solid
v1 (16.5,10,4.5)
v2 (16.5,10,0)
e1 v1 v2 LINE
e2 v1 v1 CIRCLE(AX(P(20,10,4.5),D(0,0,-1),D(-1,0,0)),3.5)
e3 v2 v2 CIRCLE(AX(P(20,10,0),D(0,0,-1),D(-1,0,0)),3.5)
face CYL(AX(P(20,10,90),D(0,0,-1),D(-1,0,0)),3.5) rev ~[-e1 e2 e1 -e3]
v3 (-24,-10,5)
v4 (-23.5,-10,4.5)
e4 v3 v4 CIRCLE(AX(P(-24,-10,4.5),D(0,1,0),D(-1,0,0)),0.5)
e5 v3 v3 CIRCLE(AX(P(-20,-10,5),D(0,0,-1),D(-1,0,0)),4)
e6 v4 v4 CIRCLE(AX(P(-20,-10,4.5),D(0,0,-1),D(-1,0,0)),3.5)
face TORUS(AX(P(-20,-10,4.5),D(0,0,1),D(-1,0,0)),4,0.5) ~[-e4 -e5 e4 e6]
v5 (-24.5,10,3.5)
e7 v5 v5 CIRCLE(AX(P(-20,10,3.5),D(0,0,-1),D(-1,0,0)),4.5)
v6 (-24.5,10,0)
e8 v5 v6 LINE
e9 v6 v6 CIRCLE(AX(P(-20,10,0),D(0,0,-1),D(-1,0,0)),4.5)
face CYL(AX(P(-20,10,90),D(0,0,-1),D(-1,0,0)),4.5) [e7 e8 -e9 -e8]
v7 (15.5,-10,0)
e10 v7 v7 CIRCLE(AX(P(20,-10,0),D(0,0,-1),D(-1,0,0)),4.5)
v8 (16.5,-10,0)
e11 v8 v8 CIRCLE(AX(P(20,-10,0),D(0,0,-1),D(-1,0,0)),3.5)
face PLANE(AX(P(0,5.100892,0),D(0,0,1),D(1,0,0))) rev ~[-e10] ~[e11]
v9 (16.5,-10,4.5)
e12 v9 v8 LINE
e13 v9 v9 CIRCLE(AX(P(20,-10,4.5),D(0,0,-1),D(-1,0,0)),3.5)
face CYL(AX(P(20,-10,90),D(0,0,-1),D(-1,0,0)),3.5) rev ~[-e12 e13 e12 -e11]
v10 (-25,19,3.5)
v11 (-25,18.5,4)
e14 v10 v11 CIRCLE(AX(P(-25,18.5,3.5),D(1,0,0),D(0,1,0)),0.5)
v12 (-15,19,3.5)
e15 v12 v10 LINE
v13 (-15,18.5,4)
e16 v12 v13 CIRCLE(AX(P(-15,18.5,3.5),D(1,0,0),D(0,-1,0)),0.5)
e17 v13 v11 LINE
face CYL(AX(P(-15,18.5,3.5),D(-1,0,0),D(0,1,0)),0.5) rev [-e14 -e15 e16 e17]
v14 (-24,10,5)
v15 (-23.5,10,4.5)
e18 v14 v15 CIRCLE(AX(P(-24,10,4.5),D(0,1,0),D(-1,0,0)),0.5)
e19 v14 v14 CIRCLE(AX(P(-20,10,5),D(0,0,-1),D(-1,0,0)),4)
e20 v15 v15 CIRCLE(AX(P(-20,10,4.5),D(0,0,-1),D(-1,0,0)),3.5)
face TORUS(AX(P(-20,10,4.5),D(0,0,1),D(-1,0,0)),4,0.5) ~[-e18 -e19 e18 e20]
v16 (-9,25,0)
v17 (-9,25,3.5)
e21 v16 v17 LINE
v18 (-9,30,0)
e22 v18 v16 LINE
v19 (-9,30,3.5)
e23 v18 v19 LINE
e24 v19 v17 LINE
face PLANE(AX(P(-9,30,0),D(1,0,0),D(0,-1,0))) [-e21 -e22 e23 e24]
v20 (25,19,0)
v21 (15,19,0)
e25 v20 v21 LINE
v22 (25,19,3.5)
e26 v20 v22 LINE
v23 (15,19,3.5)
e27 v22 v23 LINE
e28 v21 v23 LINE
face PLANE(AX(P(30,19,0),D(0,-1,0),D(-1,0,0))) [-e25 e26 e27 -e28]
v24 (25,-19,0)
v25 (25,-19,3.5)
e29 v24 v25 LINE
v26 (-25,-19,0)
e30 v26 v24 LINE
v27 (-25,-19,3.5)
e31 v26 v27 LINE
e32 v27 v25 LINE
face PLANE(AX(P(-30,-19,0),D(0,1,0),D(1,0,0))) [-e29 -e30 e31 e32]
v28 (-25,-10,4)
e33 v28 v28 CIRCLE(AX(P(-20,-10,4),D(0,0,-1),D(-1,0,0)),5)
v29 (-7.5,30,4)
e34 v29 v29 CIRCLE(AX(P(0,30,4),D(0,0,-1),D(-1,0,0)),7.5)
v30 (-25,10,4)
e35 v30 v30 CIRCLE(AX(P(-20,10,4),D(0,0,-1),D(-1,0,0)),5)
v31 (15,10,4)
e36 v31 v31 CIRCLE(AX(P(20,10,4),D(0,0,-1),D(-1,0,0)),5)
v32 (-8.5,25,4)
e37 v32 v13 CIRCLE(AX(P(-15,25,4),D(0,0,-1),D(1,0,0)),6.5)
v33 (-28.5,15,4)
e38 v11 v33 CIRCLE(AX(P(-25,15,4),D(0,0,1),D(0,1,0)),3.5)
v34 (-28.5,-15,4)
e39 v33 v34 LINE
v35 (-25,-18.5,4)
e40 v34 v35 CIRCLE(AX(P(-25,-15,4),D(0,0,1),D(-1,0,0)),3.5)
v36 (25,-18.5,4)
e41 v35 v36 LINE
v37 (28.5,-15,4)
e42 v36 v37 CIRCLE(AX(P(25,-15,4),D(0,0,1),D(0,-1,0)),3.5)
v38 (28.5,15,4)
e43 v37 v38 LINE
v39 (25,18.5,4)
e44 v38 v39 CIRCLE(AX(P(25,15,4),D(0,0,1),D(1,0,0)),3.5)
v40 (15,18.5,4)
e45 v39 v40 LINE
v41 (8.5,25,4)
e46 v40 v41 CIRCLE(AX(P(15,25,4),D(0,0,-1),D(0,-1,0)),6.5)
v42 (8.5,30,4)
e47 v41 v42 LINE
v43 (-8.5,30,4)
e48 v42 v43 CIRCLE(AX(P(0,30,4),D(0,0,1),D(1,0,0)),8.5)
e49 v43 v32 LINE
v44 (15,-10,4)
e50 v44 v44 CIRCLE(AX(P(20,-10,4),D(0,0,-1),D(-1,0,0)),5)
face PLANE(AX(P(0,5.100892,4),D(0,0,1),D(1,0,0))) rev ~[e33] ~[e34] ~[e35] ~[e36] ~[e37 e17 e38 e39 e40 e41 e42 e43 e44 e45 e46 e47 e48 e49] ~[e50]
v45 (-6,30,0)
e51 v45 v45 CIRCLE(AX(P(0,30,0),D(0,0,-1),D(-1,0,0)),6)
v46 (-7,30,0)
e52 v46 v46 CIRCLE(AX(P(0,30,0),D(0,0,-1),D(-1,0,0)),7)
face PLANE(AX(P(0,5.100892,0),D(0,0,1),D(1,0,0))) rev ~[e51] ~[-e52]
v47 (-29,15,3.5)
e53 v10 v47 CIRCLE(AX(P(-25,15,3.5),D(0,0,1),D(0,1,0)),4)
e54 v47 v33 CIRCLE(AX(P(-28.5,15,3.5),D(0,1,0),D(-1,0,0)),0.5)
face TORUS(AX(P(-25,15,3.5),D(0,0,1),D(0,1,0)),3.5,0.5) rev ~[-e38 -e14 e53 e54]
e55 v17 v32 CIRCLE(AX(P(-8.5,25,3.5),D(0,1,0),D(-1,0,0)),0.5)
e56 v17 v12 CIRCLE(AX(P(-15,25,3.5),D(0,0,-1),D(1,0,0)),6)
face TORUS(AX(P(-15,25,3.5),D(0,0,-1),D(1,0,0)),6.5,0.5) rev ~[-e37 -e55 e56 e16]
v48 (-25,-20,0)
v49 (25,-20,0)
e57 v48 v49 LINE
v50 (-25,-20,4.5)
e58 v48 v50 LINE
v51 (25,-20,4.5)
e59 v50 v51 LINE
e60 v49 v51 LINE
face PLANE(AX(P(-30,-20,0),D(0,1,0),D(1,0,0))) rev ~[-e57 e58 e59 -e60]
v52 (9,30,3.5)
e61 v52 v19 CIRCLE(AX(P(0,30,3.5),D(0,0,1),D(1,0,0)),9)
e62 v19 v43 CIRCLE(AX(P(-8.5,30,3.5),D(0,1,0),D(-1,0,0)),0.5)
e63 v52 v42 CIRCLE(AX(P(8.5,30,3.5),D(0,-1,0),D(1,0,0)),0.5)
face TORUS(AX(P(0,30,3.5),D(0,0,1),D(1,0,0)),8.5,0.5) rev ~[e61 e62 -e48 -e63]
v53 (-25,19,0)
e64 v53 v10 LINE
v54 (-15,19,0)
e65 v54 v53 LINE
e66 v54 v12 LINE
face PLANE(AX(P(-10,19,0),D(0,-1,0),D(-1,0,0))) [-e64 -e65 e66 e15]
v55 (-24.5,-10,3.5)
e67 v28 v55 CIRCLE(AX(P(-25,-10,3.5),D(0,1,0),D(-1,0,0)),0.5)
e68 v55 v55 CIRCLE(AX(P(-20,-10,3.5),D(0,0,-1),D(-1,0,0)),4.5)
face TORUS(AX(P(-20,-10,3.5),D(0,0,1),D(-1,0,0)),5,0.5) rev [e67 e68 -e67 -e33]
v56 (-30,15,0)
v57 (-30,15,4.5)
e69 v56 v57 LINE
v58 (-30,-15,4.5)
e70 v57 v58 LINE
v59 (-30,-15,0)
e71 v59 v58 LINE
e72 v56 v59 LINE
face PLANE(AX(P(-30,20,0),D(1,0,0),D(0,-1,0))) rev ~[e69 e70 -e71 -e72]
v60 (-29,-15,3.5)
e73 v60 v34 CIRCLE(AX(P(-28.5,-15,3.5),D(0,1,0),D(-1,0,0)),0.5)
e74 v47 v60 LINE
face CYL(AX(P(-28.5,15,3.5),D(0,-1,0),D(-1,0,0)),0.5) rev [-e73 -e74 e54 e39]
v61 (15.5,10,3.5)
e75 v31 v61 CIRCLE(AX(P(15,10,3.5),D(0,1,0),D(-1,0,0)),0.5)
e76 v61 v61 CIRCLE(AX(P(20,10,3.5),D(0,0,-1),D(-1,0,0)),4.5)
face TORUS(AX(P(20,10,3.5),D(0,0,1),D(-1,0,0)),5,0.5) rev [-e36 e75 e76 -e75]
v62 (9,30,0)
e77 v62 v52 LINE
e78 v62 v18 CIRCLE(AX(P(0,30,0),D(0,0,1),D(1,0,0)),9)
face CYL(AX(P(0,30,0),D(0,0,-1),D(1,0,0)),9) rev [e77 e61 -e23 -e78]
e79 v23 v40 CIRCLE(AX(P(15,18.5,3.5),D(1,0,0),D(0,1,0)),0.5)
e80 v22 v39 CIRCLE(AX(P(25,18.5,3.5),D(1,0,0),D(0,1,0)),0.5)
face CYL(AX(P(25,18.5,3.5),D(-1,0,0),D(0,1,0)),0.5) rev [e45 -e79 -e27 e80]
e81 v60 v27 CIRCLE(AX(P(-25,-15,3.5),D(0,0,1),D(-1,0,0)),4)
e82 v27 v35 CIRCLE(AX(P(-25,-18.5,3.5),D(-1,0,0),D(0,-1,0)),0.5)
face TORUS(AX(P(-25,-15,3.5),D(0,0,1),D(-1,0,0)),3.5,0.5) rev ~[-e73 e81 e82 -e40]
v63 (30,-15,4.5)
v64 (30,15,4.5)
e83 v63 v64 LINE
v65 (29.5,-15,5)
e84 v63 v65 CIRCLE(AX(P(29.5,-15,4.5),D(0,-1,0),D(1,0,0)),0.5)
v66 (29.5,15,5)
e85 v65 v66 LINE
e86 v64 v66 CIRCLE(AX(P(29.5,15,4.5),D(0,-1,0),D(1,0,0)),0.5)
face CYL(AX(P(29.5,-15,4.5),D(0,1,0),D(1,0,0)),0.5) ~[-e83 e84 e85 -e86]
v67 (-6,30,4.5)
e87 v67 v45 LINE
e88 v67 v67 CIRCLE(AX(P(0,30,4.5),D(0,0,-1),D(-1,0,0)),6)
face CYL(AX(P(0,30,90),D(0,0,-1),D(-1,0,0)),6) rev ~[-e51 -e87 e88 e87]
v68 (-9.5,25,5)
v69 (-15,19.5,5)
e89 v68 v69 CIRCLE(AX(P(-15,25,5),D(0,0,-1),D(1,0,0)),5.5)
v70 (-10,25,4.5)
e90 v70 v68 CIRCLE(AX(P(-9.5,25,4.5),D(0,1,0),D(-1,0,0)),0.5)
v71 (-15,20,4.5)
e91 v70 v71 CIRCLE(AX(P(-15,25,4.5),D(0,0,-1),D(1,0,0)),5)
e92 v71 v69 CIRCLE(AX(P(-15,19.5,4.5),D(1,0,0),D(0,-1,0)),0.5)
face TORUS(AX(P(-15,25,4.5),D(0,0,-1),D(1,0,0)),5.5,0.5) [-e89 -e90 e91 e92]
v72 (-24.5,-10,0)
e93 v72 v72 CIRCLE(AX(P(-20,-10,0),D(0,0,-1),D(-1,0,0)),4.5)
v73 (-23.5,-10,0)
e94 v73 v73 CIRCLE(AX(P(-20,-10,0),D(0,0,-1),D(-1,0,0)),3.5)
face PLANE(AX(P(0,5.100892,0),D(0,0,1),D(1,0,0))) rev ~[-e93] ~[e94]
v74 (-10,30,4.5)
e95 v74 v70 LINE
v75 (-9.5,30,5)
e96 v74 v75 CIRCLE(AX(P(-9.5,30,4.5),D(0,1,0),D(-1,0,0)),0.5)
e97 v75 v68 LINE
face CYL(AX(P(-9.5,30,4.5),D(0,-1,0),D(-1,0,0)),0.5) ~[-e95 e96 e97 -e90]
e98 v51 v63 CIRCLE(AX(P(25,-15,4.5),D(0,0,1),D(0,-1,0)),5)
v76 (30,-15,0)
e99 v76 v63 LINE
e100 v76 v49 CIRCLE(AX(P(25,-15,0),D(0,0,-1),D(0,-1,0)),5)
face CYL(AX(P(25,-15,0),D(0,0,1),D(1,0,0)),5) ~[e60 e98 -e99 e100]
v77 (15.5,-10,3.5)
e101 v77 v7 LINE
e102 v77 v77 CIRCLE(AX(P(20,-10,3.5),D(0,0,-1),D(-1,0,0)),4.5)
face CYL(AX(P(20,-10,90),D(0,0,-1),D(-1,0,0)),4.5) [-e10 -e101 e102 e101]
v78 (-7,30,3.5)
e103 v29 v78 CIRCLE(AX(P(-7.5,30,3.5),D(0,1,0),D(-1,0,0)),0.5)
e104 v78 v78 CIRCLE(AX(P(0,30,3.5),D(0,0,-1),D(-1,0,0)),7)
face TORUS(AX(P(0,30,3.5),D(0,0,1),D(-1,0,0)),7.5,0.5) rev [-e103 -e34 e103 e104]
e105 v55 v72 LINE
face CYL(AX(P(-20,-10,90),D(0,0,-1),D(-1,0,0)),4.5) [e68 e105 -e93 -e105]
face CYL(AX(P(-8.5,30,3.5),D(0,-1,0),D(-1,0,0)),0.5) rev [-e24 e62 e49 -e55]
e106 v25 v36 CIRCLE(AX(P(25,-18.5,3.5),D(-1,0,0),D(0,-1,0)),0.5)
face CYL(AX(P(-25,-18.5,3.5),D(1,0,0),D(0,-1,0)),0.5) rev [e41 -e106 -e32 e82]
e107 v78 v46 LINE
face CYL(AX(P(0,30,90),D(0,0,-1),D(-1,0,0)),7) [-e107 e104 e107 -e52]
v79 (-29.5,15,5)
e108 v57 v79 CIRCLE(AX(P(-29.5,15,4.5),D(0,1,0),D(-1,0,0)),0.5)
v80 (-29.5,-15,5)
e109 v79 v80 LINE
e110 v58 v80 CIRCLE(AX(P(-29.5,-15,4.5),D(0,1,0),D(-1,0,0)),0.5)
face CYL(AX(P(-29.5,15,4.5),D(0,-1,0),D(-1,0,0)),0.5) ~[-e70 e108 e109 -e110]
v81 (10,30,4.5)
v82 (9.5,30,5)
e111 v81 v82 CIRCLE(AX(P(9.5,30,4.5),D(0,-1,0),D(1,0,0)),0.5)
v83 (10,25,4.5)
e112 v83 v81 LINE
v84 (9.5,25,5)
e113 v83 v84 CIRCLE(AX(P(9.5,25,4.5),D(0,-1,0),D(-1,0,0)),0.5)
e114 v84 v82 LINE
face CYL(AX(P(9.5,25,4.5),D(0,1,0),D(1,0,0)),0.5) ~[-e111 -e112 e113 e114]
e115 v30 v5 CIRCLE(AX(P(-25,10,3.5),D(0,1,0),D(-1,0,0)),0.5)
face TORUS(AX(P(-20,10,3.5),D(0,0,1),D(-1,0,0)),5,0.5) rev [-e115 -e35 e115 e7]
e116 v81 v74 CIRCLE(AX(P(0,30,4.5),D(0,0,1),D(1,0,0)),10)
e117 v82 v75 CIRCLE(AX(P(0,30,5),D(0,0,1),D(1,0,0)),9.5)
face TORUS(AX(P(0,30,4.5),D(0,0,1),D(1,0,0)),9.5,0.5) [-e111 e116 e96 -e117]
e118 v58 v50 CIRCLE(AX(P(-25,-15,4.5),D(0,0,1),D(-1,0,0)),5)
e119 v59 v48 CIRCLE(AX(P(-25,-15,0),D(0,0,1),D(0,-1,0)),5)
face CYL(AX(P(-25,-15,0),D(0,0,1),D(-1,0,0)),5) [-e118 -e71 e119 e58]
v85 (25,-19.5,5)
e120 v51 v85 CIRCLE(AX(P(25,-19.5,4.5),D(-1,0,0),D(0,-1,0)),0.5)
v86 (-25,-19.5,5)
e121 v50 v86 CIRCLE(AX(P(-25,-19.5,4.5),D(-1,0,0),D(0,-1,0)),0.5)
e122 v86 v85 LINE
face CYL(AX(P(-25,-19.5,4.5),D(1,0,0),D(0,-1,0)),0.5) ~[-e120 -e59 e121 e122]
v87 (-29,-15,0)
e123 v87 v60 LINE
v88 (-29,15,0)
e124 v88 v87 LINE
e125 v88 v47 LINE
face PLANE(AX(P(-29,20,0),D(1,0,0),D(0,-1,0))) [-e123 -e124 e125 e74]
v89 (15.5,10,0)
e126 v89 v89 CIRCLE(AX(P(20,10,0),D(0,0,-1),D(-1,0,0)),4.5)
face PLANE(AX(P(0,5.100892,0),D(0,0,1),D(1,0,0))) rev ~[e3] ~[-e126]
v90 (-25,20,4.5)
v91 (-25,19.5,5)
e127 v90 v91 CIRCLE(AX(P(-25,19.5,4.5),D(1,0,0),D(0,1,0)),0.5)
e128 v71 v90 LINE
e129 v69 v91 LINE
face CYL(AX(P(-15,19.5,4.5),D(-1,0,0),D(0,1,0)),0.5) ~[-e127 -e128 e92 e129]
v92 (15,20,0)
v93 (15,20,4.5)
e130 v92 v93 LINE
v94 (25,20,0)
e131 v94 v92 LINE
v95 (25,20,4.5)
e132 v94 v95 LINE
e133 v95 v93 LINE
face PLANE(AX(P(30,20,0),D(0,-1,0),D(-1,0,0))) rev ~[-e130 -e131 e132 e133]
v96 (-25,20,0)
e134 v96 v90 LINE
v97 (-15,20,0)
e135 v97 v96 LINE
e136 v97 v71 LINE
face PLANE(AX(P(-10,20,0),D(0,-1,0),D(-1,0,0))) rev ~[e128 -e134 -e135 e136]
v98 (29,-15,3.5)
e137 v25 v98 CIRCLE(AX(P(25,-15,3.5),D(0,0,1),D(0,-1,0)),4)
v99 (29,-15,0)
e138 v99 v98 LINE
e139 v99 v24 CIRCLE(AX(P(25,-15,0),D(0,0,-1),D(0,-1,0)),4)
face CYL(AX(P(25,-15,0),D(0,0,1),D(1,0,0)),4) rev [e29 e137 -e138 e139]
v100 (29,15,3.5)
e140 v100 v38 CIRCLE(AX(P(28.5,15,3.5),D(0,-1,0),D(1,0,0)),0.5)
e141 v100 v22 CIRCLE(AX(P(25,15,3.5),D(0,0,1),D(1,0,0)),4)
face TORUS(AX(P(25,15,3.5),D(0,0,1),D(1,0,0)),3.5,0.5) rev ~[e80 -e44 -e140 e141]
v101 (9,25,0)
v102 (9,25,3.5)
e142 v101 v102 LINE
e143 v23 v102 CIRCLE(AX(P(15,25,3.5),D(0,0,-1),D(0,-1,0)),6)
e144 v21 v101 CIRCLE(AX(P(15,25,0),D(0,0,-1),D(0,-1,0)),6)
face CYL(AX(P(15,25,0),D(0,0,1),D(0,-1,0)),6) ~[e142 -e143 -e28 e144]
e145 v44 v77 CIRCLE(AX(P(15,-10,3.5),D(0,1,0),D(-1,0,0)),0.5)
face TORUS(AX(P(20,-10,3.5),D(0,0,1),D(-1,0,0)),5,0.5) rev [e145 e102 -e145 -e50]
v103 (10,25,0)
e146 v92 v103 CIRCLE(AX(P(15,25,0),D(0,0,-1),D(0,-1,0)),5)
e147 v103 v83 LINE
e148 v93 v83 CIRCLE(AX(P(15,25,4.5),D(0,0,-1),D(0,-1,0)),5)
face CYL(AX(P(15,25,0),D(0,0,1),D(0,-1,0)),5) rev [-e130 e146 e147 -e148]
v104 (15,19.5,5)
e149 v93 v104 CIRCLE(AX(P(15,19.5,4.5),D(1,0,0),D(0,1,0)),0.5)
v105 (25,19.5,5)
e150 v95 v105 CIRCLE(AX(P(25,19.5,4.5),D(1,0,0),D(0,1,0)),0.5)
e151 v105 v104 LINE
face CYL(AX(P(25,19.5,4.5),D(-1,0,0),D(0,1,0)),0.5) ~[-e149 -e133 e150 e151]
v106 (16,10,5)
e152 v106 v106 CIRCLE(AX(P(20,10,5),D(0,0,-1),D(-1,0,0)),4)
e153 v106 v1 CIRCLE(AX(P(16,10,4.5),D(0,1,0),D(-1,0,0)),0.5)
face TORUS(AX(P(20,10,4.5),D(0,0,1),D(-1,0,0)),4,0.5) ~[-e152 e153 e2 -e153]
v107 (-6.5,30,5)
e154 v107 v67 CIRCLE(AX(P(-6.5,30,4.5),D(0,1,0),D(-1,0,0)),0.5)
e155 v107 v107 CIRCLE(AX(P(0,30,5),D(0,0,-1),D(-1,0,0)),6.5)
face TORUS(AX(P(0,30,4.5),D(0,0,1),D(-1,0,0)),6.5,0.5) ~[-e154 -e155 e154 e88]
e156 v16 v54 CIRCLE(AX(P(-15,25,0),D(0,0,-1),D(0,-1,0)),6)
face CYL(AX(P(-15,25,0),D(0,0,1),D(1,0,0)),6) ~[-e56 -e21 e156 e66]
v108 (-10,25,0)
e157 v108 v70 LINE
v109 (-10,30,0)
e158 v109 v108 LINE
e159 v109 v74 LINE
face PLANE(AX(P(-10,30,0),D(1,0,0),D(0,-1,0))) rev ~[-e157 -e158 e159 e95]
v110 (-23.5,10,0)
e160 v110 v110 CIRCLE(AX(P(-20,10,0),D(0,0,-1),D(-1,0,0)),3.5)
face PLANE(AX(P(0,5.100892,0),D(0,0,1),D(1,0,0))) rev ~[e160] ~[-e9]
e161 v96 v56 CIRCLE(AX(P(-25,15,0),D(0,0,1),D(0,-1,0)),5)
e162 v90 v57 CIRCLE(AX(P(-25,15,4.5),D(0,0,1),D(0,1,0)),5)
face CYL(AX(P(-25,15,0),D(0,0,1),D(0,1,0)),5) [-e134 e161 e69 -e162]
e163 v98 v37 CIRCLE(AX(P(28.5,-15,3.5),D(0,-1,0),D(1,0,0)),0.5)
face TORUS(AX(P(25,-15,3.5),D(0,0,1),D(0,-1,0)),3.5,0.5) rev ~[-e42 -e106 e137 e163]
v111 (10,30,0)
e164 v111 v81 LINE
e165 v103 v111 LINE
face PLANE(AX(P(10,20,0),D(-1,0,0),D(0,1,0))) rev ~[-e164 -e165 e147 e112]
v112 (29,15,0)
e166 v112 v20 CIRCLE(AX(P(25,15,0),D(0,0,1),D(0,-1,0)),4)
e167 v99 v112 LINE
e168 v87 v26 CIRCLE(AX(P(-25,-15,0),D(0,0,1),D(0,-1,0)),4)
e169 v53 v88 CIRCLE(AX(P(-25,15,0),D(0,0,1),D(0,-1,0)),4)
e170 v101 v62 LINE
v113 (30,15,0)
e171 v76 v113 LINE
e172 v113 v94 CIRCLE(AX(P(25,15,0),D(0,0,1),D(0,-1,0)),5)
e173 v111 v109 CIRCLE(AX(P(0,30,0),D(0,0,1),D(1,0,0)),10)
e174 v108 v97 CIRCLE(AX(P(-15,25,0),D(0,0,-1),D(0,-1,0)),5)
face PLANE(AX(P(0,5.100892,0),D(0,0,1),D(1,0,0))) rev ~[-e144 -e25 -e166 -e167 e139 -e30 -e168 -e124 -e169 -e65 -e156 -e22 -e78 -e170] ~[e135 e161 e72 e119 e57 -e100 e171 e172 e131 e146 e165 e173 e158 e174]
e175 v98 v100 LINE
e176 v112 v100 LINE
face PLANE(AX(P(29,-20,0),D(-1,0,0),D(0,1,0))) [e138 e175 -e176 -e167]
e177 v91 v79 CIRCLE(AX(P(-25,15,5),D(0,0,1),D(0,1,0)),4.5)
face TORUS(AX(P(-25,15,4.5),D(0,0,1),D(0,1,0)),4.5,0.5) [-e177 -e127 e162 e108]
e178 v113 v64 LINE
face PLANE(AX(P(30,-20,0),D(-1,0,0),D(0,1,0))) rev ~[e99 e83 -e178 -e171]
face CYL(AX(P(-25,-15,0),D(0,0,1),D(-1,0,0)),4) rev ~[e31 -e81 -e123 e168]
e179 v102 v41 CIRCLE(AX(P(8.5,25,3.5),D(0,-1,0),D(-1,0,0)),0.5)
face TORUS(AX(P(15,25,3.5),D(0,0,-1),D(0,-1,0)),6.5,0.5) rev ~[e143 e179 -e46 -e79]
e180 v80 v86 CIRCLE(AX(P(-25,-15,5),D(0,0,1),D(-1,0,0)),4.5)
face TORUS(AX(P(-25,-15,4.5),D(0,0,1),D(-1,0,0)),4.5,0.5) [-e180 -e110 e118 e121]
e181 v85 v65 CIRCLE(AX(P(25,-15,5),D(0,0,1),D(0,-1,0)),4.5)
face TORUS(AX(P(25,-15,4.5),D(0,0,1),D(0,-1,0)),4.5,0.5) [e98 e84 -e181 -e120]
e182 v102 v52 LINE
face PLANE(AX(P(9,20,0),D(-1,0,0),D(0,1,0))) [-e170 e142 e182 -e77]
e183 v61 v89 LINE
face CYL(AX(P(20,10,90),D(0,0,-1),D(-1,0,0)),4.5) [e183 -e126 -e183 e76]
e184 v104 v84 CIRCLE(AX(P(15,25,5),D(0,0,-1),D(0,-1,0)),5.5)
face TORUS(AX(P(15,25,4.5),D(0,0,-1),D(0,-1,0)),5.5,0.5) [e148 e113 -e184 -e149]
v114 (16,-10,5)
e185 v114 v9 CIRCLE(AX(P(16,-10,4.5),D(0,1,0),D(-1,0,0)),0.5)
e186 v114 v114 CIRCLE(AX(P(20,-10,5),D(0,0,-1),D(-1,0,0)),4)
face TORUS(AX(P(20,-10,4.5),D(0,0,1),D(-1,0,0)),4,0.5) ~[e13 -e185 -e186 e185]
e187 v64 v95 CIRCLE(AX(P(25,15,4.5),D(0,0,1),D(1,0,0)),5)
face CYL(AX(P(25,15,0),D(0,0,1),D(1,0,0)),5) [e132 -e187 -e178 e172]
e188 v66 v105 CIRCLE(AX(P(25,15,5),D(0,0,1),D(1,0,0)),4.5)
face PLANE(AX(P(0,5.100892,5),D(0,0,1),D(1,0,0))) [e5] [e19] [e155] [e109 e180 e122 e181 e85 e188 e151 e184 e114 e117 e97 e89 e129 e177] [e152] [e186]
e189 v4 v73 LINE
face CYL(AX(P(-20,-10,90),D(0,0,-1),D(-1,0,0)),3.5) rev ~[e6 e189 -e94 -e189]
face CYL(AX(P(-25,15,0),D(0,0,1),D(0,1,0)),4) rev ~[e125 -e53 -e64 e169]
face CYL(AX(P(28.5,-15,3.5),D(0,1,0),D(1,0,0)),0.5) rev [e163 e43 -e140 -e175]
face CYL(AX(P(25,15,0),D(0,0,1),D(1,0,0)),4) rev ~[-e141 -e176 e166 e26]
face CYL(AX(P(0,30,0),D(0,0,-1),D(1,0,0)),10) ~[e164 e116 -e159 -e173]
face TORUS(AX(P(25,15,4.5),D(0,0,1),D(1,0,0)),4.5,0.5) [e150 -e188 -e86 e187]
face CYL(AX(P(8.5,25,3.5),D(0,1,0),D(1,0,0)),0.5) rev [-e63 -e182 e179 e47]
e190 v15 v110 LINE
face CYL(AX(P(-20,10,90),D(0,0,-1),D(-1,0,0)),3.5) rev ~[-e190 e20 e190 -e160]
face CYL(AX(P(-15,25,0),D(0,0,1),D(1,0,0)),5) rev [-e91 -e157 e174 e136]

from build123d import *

# Parameters (mm, degrees)
F1_DEPTH = 5
F2_R     = 5
F4_D     = 7
F6_D     = 12
F7_R     = 0.5
F8_T     = -1
F9_R     = 0.5


with BuildPart() as f1:
    # F0 (on Top) → F1 (new body)
    with BuildSketch(Plane.XY):
        with BuildLine():
            Line((30, -20), (30, 20))
            Line((30, 20), (10, 20))
            Line((10, 20), (10, 30))
            ThreePointArc((10, 30), (0, 40), (-10, 30))
            Line((-10, 30), (-10, 20))
            Line((-10, 20), (-30, 20))
            Line((-30, 20), (-30, -20))
            Line((-30, -20), (30, -20))
        make_face()
    extrude(amount=F1_DEPTH)

    # F2
    f2_edges = [f1.edges().sort_by_distance(p)[0] for p in [
        (30, 20, 2.5),
        (30, -20, 2.5),
        (10, 20, 2.5),
        (-30, -20, 2.5),
        (-30, 20, 2.5),
        (-10, 20, 2.5),
    ]]
    fillet(f2_edges, radius=F2_R)

    # F4 (through all)
    with Locations(Plane.XY.offset(5)):
        with Locations((20, 10), (20, -10), (-20, 10), (-20, -10)):
            Hole(F4_D / 2)

    # F6 (through all)
    with Locations(Plane.XY.offset(5)):
        with Locations((0, 30)):
            Hole(F6_D / 2)

    # F7
    f7_edges = [f1.edges().sort_by_distance(p)[0] for p in [
        (30, 0, 5),
        (28.535534, -18.535534, 5),
        (28.535534, 18.535534, 5),
        (0, -20, 5),
        (20, 20, 5),
        (-28.535534, -18.535534, 5),
        (11.464466, 21.464466, 5),
        (-30, 0, 5),
        (10, 27.5, 5),
        (-28.535534, 18.535534, 5),
        (0, 40, 5),
        (-20, 20, 5),
        (-10, 27.5, 5),
        (-11.464466, 21.464466, 5),
        (-23.5, -10, 5),
        (-23.5, 10, 5),
        (16.5, -10, 5),
        (16.5, 10, 5),
        (-6, 30, 5),
    ]]
    fillet(f7_edges, radius=F7_R)

    # F8
    f8_openings = [f1.faces().sort_by_distance(p)[0] for p in [
        (0, 2.90916, 0),
    ]]
    offset(amount=F8_T, openings=f8_openings)

    # F9
    f9_edges = [f1.edges().sort_by_distance(p)[0] for p in [
        (9, 30, 2),
        (-9, 30, 2),
        (29, 0, 4),
        (27.828427, -17.828427, 4),
        (27.828427, 17.828427, 4),
        (0, -19, 4),
        (20, 19, 4),
        (-27.828427, -17.828427, 4),
        (10.757359, 20.757359, 4),
        (-29, 0, 4),
        (9, 27.5, 4),
        (-27.828427, 17.828427, 4),
        (0, 39, 4),
        (-20, 19, 4),
        (-9, 27.5, 4),
        (-10.757359, 20.757359, 4),
        (-24.5, -10, 4),
        (-24.5, 10, 4),
        (15.5, -10, 4),
        (15.5, 10, 4),
        (-7, 30, 4),
    ]]
    fillet(f9_edges, radius=F9_R)


solid = f1.part
